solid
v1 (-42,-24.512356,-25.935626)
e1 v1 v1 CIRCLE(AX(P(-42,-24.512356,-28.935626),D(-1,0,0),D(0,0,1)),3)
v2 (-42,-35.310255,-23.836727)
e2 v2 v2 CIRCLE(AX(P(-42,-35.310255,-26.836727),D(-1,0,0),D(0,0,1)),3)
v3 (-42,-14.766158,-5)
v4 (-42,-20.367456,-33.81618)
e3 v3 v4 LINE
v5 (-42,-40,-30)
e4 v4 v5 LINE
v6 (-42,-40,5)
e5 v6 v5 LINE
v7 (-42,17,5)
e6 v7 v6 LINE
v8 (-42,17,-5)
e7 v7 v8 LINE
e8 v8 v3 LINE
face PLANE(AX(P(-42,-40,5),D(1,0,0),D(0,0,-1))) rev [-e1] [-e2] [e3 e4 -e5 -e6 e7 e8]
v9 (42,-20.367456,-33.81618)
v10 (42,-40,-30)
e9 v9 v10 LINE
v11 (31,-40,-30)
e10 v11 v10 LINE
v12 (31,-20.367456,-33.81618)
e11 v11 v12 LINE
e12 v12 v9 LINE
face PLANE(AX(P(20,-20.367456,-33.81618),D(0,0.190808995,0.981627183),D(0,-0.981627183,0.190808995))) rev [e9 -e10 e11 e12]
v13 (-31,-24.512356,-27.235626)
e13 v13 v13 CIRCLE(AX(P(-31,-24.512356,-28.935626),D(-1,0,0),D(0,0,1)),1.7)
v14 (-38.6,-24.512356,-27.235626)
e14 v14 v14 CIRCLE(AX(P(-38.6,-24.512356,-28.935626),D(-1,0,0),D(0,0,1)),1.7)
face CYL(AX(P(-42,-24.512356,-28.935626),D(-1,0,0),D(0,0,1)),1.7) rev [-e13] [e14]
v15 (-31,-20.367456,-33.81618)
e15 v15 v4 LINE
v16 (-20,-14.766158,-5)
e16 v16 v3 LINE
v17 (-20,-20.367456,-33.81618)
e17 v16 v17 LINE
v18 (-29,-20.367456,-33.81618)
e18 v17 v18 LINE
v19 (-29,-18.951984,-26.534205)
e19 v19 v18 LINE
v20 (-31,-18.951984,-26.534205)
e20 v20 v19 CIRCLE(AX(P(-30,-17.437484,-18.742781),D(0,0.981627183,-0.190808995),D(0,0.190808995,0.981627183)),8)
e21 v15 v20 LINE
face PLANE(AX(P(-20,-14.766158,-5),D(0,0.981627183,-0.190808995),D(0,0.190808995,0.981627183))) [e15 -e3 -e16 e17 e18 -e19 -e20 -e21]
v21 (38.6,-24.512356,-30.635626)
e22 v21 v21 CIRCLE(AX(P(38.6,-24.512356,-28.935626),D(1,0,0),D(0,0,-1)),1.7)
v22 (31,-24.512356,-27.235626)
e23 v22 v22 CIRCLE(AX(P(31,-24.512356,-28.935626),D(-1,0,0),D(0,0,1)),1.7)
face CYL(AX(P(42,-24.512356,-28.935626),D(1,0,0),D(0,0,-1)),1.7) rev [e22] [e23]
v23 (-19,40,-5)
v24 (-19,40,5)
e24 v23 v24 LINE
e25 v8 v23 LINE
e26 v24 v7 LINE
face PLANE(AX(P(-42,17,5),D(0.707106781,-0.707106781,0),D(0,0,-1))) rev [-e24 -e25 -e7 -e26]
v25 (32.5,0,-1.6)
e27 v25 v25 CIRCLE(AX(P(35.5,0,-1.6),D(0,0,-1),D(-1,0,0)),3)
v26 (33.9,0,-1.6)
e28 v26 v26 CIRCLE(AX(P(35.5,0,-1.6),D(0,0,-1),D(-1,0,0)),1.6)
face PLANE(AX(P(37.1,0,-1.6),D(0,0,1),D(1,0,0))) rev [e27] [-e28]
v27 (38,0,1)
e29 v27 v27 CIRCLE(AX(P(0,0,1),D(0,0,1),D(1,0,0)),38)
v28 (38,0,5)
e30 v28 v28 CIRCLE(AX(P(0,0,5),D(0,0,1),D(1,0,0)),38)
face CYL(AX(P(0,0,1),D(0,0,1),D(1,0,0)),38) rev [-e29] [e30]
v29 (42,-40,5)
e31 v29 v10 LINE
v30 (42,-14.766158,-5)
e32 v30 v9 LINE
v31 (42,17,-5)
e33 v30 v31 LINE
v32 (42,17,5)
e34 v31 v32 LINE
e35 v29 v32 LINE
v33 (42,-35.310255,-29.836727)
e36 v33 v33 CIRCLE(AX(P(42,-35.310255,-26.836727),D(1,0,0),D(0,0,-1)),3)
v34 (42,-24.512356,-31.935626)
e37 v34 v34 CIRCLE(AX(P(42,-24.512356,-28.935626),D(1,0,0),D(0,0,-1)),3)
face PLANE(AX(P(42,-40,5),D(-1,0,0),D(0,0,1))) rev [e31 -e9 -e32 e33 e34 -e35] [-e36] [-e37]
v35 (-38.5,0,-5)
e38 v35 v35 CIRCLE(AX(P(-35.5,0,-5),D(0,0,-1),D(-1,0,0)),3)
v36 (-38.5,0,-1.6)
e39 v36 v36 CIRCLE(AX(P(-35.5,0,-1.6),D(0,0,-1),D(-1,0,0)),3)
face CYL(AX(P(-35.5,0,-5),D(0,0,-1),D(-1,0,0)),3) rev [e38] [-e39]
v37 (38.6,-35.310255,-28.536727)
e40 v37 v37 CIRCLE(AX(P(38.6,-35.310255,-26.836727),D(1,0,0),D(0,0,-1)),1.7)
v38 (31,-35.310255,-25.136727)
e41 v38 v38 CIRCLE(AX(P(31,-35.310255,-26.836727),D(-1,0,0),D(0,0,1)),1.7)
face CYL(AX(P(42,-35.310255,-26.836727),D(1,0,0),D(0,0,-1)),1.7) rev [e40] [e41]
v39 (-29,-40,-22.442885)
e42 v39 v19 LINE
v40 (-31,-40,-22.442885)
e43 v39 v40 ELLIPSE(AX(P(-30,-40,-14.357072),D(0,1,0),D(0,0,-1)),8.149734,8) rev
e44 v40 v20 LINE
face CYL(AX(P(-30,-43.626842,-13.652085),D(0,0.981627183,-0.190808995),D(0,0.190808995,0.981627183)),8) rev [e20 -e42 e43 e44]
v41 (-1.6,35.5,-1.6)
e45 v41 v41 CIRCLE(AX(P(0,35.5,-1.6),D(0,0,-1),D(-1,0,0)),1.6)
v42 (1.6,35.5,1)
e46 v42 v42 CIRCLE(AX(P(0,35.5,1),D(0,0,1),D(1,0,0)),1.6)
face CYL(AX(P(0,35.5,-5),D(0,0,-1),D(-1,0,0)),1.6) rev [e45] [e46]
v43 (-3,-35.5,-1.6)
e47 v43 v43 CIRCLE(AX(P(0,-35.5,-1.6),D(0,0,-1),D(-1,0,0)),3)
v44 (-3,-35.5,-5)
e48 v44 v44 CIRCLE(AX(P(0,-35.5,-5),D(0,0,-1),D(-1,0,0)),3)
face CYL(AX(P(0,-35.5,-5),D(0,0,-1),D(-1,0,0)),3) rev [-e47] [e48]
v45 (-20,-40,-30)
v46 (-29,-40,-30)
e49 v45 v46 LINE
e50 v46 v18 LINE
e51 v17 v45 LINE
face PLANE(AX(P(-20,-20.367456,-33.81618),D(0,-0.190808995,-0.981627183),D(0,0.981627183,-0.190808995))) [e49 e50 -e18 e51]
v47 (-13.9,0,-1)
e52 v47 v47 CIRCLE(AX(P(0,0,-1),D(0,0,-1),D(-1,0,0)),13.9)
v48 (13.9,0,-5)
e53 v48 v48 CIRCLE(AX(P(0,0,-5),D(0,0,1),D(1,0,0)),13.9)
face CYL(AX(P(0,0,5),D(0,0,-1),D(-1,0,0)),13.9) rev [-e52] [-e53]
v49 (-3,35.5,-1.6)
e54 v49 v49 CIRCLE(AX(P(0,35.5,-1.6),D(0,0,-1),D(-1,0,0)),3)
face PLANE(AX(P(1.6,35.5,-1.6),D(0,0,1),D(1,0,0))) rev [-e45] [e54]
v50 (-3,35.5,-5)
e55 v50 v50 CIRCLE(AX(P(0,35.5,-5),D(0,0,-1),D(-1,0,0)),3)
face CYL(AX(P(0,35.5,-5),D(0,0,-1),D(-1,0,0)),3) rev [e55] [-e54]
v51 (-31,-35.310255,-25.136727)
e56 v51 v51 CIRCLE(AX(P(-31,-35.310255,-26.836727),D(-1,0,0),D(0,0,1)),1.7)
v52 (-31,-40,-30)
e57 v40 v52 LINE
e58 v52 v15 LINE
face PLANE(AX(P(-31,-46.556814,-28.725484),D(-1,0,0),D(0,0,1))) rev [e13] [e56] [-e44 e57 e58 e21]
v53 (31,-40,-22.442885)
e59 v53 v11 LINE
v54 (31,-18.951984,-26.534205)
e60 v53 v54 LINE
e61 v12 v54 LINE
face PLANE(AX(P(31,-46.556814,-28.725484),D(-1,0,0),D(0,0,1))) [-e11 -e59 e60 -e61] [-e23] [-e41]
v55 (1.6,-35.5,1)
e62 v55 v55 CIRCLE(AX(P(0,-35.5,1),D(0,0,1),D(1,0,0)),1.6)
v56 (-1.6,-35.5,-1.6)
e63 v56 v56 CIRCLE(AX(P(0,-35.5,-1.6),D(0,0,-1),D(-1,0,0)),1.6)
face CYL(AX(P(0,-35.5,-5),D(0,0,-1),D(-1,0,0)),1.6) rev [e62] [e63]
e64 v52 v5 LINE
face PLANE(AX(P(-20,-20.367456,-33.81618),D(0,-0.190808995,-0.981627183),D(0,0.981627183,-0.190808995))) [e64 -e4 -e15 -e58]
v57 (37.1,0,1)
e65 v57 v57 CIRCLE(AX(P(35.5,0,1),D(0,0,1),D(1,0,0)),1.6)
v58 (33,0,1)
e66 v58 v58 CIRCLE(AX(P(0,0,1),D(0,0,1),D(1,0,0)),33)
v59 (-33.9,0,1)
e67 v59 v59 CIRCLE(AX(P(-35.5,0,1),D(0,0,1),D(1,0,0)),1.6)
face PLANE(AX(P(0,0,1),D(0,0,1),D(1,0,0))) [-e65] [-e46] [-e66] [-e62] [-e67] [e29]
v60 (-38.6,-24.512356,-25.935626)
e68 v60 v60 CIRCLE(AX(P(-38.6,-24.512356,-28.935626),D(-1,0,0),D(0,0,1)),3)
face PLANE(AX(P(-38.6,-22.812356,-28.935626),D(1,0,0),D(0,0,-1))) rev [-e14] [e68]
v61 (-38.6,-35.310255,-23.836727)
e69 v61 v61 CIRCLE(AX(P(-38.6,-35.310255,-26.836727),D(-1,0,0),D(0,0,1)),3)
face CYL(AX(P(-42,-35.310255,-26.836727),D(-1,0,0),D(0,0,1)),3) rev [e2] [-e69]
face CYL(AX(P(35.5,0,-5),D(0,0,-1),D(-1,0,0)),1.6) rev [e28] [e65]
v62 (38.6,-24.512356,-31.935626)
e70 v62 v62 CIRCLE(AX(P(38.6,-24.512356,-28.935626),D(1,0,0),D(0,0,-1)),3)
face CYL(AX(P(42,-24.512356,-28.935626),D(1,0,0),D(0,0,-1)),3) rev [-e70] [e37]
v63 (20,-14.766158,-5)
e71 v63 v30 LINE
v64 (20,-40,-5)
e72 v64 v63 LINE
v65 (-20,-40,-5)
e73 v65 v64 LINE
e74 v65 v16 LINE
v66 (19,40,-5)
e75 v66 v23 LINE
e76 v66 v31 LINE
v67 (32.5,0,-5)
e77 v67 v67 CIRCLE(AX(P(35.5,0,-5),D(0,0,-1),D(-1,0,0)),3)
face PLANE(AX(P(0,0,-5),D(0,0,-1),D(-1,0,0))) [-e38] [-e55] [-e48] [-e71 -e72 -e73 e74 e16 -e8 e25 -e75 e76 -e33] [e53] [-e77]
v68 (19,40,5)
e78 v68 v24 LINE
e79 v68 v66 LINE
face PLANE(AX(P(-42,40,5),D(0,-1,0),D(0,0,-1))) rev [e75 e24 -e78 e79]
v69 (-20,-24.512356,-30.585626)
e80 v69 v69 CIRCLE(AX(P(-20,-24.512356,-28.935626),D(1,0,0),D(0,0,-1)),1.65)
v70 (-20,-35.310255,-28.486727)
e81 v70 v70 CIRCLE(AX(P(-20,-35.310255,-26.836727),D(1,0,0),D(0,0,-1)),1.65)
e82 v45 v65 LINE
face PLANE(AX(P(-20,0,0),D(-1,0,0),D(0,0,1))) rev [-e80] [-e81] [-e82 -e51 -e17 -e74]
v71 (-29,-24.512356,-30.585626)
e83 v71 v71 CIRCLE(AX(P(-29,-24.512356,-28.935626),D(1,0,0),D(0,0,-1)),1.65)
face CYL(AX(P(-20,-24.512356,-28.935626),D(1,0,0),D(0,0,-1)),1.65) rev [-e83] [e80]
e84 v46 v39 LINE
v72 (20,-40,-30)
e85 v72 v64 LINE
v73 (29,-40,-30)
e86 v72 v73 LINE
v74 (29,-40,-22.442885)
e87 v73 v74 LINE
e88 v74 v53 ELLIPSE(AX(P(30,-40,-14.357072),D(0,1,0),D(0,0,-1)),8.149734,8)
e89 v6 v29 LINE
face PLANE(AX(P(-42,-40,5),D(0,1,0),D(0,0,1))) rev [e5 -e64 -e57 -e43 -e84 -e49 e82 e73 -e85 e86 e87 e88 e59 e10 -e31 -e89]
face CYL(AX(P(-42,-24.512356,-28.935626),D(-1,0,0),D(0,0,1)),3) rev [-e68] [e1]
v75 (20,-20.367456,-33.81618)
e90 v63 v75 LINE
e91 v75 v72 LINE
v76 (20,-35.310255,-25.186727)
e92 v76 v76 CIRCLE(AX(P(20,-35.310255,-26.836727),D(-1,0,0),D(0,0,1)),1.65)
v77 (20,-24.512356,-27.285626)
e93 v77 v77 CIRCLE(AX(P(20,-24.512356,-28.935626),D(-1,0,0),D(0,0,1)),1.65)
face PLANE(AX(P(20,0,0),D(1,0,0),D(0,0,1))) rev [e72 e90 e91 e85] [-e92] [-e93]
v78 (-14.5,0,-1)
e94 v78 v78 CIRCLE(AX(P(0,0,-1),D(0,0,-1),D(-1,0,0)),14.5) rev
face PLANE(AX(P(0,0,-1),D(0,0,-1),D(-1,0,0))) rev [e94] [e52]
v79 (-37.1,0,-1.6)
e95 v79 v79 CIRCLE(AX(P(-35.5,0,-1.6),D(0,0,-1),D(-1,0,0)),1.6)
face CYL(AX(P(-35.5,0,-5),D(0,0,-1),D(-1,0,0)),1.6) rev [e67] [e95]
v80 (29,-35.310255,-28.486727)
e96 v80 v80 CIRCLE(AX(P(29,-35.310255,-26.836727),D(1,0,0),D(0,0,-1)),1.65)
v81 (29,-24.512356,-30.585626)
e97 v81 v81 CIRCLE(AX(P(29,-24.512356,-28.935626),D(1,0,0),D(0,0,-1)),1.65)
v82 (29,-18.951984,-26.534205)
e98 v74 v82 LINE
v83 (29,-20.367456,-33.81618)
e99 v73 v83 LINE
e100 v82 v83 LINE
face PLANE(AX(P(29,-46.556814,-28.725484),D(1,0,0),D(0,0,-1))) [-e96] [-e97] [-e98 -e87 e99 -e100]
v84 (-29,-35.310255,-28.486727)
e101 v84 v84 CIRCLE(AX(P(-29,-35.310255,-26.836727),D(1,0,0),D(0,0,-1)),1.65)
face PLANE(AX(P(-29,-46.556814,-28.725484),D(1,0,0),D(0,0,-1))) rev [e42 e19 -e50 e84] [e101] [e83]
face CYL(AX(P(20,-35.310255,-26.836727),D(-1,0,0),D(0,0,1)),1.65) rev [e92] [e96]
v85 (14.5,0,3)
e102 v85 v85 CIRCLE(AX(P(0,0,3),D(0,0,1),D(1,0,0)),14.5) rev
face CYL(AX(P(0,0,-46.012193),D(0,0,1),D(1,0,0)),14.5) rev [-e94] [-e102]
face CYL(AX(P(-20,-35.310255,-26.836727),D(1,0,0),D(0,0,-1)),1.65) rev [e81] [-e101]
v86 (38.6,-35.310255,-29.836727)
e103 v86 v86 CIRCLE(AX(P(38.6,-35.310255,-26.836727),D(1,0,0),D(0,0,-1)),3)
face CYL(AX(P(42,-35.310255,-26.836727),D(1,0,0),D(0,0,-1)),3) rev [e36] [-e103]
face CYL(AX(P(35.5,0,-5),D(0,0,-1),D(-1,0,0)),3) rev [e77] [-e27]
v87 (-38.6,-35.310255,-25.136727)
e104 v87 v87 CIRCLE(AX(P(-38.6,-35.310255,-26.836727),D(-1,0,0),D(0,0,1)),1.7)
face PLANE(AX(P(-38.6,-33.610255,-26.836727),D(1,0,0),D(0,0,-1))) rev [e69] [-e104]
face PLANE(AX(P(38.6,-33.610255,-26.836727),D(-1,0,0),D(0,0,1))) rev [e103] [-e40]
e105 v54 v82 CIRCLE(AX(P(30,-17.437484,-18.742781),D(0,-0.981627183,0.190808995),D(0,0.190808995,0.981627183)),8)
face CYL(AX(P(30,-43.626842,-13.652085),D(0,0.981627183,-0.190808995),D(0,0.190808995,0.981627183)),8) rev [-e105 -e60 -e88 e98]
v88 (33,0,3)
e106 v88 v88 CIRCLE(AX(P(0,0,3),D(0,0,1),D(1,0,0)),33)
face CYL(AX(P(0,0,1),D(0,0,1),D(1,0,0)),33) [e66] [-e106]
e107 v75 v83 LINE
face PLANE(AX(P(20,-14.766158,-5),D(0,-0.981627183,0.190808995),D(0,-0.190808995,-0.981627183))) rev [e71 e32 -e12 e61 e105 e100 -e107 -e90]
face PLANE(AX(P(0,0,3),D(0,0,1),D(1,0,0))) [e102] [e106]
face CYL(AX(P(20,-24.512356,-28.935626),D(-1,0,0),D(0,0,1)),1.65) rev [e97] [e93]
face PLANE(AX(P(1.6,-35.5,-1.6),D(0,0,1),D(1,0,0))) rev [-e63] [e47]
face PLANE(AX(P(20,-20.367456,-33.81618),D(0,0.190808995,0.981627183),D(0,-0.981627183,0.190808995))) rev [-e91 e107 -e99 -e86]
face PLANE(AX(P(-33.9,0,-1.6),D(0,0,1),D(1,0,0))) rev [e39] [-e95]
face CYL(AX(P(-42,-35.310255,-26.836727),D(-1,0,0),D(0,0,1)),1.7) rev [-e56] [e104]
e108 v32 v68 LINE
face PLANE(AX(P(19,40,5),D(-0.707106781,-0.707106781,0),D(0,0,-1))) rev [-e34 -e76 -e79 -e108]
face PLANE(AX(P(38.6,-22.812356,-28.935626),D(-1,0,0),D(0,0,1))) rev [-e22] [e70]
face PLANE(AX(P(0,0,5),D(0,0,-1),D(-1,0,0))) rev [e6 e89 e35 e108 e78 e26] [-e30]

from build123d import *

# Parameters (mm, degrees)
SKETCH_1_W                  = 84
SKETCH_1_H                  = 80
SKETCH_1_R                  = 13.9
EXTRUDE_1_DEPTH             = 5
EXTRUDE_2_DEPTH             = 22
CUT_EXTRUDE_3_REACH         = 79
HOLE_START                  = -42
HOLE_WIZARD_2_OUTLINE_R     = 1.7
HOLE_WIZARD_2_DEPTH         = 11
HOLE_WIZARD_2_2_OUTLINE_R   = 3
HOLE_WIZARD_2_2_OUTLINE_R_2 = 1.7
HOLE_WIZARD_2_2_DEPTH       = 3.4
HOLE_WIZARD_M4_2_D          = 3.3
SKETCH_14_R                 = 38
SKETCH_14_R_2               = 33
CUT_EXTRUDE_4_DEPTH         = 4
HOLE_WIZARD_3_D             = 3.2
HOLE_WIZARD_3_CBORE_D       = 6
HOLE_WIZARD_3_CBORE_DEPTH   = 3.4
CHAMFER_1_SIZE              = 23
SKETCH_17_R                 = 14.5
CUT_EXTRUDE_5_DEPTH         = 6
SKETCH_18_R                 = 33
CUT_EXTRUDE_6_DEPTH         = 2


# Read off the part's stored shape, not the designer's step: 打孔尺寸(%根据)内六角圆柱头螺钉的类型2
with BuildPart() as part:
    # 草图1 → 凸台-拉伸1 (new, symmetric)
    with BuildSketch(Plane.XY):
        Rectangle(SKETCH_1_W, SKETCH_1_H)
        Circle(SKETCH_1_R, mode=Mode.SUBTRACT)
    extrude(amount=EXTRUDE_1_DEPTH, both=True)

    # 草图6 → 凸台-拉伸2 (add)
    with BuildSketch(Plane.ZY.offset(42)):
        Polygon((-5, -14.766158372), (-5, -40), (-30, -40), (-33.816179908, -20.367456331), align=None)
    extrude_2 = extrude(amount=-EXTRUDE_2_DEPTH)

    # 切除-拉伸3: up to this plane
    cut_extrude_3_end = Plane(origin=(-42, -40, 5), z_dir=(0, 1, 0))
    # 草图7 → 切除-拉伸3 (cut, up to the surface)
    with BuildSketch(Plane(origin=(0, -13.292034521, 2.583709779), x_dir=(1, 0, 0), z_dir=(0, 0.9816271834476648, -0.19080899537654153)), mode=Mode.PRIVATE) as cut_extrude_3_sk1:
        with BuildLine():
            Line((-31, 37.081175318), (-29, 37.081175318))
            Line((-29, 37.081175318), (-29, 29.662905695))
            ThreePointArc((-29, 29.662905695), (-30, 13.725651762), (-31, 29.662905695))
            Line((-31, 29.662905695), (-31, 37.081175318))
        make_face()
    cut_extrude_3_tool1 = split(extrude(cut_extrude_3_sk1.sketch, amount=-CUT_EXTRUDE_3_REACH, mode=Mode.PRIVATE), bisect_by=cut_extrude_3_end, keep=Keep.BOTH, mode=Mode.PRIVATE)
    cut_extrude_3 = cut_extrude_3_tool1.solids().sort_by_distance((-30, -17.589666, -19.525688))[0]
    add(cut_extrude_3, mode=Mode.SUBTRACT)

    # 打孔尺寸(%根据)内六角圆柱头螺钉的类型2 outline → 打孔尺寸(%根据)内六角圆柱头螺钉的类型2 (cut)
    with BuildSketch(Plane.YZ.offset(HOLE_START)):
        with Locations((-35.310255285, -26.836727248)):
            Circle(HOLE_WIZARD_2_OUTLINE_R)
        with Locations((-24.512356267, -28.935626197)):
            Circle(HOLE_WIZARD_2_OUTLINE_R)
    hole_wizard_2 = extrude(amount=HOLE_WIZARD_2_DEPTH, mode=Mode.SUBTRACT)

    # Hole Wizard 2 2 outline → Hole Wizard 2 2 (cut)
    # profile 1 of 2: a face of its own
    with BuildSketch(Plane.YZ.offset(HOLE_START)):
        with Locations((-35.310255285, -26.836727248)):
            Circle(HOLE_WIZARD_2_2_OUTLINE_R)
        with Locations((-35.310255285, -26.836727248)):
            Circle(HOLE_WIZARD_2_2_OUTLINE_R_2, mode=Mode.SUBTRACT)
    # profile 2 of 2: a face of its own
    with BuildSketch(Plane.YZ.offset(HOLE_START)):
        with Locations((-24.512356267, -28.935626197)):
            Circle(HOLE_WIZARD_2_2_OUTLINE_R)
        with Locations((-24.512356267, -28.935626197)):
            Circle(HOLE_WIZARD_2_2_OUTLINE_R_2, mode=Mode.SUBTRACT)
    hole_wizard_2_2 = extrude(amount=HOLE_WIZARD_2_2_DEPTH, mode=Mode.SUBTRACT)

    # M4 螺纹孔2 (through all)
    with Locations(Plane(origin=(-20, 0, 0), x_dir=(0, 0, -1), z_dir=(1, 0, 0))):
        with Locations((28.935626197, -24.512356267), (26.836727248, -35.310255285)):
            hole_wizard_m4_2 = Hole(HOLE_WIZARD_M4_2_D / 2)

    # 草图14 → 切除-拉伸4 (cut)
    with BuildSketch(Plane.XY.offset(5)):
        Circle(SKETCH_14_R)
        Circle(SKETCH_14_R_2, mode=Mode.SUBTRACT)
    extrude(amount=-CUT_EXTRUDE_4_DEPTH, mode=Mode.SUBTRACT)

    # 镜向1: 凸台-拉伸2, 切除-拉伸3, 打孔尺寸(%根据)内六角圆柱头螺钉的类型2, Hole Wizard 2 2, M4 螺纹孔2 across plane
    add(extrude_2.mirror(Plane(origin=(0, 0, 0), x_dir=(0, 0, 1), z_dir=(1, 0, 0))))
    add(cut_extrude_3.mirror(Plane(origin=(0, 0, 0), x_dir=(0, 0, 1), z_dir=(1, 0, 0))), mode=Mode.SUBTRACT)
    add(hole_wizard_2.mirror(Plane(origin=(0, 0, 0), x_dir=(0, 0, 1), z_dir=(1, 0, 0))), mode=Mode.SUBTRACT)
    add(hole_wizard_2_2.mirror(Plane(origin=(0, 0, 0), x_dir=(0, 0, 1), z_dir=(1, 0, 0))), mode=Mode.SUBTRACT)
    add(hole_wizard_m4_2.mirror(Plane(origin=(0, 0, 0), x_dir=(0, 0, 1), z_dir=(1, 0, 0))), mode=Mode.SUBTRACT)

    # 打孔尺寸(%根据)内六角圆柱头螺钉的类型3 (through all)
    with Locations(Plane(origin=(0, 0, -5), x_dir=(-1, 0, 0), z_dir=(0, 0, -1))):
        with Locations((0, 35.5), (35.5, 0), (0, -35.5), (-35.5, 0)):
            CounterBoreHole(HOLE_WIZARD_3_D / 2, HOLE_WIZARD_3_CBORE_D / 2, HOLE_WIZARD_3_CBORE_DEPTH)

    # 倒角1
    chamfer_1_edges = [part.edges().sort_by_distance(p)[0] for p in [
        (42, 40, 0),
        (-42, 40, 0),
    ]]
    chamfer(chamfer_1_edges, length=CHAMFER_1_SIZE)

    # 草图17 → 切除-拉伸5 (cut)
    with BuildSketch(Plane.XY.offset(5)):
        Circle(SKETCH_17_R)
    extrude(amount=-CUT_EXTRUDE_5_DEPTH, mode=Mode.SUBTRACT)

    # 草图18 → 切除-拉伸6 (cut)
    with BuildSketch(Plane.XY.offset(5)):
        Circle(SKETCH_18_R)
    extrude(amount=-CUT_EXTRUDE_6_DEPTH, mode=Mode.SUBTRACT)


solid = part.part
